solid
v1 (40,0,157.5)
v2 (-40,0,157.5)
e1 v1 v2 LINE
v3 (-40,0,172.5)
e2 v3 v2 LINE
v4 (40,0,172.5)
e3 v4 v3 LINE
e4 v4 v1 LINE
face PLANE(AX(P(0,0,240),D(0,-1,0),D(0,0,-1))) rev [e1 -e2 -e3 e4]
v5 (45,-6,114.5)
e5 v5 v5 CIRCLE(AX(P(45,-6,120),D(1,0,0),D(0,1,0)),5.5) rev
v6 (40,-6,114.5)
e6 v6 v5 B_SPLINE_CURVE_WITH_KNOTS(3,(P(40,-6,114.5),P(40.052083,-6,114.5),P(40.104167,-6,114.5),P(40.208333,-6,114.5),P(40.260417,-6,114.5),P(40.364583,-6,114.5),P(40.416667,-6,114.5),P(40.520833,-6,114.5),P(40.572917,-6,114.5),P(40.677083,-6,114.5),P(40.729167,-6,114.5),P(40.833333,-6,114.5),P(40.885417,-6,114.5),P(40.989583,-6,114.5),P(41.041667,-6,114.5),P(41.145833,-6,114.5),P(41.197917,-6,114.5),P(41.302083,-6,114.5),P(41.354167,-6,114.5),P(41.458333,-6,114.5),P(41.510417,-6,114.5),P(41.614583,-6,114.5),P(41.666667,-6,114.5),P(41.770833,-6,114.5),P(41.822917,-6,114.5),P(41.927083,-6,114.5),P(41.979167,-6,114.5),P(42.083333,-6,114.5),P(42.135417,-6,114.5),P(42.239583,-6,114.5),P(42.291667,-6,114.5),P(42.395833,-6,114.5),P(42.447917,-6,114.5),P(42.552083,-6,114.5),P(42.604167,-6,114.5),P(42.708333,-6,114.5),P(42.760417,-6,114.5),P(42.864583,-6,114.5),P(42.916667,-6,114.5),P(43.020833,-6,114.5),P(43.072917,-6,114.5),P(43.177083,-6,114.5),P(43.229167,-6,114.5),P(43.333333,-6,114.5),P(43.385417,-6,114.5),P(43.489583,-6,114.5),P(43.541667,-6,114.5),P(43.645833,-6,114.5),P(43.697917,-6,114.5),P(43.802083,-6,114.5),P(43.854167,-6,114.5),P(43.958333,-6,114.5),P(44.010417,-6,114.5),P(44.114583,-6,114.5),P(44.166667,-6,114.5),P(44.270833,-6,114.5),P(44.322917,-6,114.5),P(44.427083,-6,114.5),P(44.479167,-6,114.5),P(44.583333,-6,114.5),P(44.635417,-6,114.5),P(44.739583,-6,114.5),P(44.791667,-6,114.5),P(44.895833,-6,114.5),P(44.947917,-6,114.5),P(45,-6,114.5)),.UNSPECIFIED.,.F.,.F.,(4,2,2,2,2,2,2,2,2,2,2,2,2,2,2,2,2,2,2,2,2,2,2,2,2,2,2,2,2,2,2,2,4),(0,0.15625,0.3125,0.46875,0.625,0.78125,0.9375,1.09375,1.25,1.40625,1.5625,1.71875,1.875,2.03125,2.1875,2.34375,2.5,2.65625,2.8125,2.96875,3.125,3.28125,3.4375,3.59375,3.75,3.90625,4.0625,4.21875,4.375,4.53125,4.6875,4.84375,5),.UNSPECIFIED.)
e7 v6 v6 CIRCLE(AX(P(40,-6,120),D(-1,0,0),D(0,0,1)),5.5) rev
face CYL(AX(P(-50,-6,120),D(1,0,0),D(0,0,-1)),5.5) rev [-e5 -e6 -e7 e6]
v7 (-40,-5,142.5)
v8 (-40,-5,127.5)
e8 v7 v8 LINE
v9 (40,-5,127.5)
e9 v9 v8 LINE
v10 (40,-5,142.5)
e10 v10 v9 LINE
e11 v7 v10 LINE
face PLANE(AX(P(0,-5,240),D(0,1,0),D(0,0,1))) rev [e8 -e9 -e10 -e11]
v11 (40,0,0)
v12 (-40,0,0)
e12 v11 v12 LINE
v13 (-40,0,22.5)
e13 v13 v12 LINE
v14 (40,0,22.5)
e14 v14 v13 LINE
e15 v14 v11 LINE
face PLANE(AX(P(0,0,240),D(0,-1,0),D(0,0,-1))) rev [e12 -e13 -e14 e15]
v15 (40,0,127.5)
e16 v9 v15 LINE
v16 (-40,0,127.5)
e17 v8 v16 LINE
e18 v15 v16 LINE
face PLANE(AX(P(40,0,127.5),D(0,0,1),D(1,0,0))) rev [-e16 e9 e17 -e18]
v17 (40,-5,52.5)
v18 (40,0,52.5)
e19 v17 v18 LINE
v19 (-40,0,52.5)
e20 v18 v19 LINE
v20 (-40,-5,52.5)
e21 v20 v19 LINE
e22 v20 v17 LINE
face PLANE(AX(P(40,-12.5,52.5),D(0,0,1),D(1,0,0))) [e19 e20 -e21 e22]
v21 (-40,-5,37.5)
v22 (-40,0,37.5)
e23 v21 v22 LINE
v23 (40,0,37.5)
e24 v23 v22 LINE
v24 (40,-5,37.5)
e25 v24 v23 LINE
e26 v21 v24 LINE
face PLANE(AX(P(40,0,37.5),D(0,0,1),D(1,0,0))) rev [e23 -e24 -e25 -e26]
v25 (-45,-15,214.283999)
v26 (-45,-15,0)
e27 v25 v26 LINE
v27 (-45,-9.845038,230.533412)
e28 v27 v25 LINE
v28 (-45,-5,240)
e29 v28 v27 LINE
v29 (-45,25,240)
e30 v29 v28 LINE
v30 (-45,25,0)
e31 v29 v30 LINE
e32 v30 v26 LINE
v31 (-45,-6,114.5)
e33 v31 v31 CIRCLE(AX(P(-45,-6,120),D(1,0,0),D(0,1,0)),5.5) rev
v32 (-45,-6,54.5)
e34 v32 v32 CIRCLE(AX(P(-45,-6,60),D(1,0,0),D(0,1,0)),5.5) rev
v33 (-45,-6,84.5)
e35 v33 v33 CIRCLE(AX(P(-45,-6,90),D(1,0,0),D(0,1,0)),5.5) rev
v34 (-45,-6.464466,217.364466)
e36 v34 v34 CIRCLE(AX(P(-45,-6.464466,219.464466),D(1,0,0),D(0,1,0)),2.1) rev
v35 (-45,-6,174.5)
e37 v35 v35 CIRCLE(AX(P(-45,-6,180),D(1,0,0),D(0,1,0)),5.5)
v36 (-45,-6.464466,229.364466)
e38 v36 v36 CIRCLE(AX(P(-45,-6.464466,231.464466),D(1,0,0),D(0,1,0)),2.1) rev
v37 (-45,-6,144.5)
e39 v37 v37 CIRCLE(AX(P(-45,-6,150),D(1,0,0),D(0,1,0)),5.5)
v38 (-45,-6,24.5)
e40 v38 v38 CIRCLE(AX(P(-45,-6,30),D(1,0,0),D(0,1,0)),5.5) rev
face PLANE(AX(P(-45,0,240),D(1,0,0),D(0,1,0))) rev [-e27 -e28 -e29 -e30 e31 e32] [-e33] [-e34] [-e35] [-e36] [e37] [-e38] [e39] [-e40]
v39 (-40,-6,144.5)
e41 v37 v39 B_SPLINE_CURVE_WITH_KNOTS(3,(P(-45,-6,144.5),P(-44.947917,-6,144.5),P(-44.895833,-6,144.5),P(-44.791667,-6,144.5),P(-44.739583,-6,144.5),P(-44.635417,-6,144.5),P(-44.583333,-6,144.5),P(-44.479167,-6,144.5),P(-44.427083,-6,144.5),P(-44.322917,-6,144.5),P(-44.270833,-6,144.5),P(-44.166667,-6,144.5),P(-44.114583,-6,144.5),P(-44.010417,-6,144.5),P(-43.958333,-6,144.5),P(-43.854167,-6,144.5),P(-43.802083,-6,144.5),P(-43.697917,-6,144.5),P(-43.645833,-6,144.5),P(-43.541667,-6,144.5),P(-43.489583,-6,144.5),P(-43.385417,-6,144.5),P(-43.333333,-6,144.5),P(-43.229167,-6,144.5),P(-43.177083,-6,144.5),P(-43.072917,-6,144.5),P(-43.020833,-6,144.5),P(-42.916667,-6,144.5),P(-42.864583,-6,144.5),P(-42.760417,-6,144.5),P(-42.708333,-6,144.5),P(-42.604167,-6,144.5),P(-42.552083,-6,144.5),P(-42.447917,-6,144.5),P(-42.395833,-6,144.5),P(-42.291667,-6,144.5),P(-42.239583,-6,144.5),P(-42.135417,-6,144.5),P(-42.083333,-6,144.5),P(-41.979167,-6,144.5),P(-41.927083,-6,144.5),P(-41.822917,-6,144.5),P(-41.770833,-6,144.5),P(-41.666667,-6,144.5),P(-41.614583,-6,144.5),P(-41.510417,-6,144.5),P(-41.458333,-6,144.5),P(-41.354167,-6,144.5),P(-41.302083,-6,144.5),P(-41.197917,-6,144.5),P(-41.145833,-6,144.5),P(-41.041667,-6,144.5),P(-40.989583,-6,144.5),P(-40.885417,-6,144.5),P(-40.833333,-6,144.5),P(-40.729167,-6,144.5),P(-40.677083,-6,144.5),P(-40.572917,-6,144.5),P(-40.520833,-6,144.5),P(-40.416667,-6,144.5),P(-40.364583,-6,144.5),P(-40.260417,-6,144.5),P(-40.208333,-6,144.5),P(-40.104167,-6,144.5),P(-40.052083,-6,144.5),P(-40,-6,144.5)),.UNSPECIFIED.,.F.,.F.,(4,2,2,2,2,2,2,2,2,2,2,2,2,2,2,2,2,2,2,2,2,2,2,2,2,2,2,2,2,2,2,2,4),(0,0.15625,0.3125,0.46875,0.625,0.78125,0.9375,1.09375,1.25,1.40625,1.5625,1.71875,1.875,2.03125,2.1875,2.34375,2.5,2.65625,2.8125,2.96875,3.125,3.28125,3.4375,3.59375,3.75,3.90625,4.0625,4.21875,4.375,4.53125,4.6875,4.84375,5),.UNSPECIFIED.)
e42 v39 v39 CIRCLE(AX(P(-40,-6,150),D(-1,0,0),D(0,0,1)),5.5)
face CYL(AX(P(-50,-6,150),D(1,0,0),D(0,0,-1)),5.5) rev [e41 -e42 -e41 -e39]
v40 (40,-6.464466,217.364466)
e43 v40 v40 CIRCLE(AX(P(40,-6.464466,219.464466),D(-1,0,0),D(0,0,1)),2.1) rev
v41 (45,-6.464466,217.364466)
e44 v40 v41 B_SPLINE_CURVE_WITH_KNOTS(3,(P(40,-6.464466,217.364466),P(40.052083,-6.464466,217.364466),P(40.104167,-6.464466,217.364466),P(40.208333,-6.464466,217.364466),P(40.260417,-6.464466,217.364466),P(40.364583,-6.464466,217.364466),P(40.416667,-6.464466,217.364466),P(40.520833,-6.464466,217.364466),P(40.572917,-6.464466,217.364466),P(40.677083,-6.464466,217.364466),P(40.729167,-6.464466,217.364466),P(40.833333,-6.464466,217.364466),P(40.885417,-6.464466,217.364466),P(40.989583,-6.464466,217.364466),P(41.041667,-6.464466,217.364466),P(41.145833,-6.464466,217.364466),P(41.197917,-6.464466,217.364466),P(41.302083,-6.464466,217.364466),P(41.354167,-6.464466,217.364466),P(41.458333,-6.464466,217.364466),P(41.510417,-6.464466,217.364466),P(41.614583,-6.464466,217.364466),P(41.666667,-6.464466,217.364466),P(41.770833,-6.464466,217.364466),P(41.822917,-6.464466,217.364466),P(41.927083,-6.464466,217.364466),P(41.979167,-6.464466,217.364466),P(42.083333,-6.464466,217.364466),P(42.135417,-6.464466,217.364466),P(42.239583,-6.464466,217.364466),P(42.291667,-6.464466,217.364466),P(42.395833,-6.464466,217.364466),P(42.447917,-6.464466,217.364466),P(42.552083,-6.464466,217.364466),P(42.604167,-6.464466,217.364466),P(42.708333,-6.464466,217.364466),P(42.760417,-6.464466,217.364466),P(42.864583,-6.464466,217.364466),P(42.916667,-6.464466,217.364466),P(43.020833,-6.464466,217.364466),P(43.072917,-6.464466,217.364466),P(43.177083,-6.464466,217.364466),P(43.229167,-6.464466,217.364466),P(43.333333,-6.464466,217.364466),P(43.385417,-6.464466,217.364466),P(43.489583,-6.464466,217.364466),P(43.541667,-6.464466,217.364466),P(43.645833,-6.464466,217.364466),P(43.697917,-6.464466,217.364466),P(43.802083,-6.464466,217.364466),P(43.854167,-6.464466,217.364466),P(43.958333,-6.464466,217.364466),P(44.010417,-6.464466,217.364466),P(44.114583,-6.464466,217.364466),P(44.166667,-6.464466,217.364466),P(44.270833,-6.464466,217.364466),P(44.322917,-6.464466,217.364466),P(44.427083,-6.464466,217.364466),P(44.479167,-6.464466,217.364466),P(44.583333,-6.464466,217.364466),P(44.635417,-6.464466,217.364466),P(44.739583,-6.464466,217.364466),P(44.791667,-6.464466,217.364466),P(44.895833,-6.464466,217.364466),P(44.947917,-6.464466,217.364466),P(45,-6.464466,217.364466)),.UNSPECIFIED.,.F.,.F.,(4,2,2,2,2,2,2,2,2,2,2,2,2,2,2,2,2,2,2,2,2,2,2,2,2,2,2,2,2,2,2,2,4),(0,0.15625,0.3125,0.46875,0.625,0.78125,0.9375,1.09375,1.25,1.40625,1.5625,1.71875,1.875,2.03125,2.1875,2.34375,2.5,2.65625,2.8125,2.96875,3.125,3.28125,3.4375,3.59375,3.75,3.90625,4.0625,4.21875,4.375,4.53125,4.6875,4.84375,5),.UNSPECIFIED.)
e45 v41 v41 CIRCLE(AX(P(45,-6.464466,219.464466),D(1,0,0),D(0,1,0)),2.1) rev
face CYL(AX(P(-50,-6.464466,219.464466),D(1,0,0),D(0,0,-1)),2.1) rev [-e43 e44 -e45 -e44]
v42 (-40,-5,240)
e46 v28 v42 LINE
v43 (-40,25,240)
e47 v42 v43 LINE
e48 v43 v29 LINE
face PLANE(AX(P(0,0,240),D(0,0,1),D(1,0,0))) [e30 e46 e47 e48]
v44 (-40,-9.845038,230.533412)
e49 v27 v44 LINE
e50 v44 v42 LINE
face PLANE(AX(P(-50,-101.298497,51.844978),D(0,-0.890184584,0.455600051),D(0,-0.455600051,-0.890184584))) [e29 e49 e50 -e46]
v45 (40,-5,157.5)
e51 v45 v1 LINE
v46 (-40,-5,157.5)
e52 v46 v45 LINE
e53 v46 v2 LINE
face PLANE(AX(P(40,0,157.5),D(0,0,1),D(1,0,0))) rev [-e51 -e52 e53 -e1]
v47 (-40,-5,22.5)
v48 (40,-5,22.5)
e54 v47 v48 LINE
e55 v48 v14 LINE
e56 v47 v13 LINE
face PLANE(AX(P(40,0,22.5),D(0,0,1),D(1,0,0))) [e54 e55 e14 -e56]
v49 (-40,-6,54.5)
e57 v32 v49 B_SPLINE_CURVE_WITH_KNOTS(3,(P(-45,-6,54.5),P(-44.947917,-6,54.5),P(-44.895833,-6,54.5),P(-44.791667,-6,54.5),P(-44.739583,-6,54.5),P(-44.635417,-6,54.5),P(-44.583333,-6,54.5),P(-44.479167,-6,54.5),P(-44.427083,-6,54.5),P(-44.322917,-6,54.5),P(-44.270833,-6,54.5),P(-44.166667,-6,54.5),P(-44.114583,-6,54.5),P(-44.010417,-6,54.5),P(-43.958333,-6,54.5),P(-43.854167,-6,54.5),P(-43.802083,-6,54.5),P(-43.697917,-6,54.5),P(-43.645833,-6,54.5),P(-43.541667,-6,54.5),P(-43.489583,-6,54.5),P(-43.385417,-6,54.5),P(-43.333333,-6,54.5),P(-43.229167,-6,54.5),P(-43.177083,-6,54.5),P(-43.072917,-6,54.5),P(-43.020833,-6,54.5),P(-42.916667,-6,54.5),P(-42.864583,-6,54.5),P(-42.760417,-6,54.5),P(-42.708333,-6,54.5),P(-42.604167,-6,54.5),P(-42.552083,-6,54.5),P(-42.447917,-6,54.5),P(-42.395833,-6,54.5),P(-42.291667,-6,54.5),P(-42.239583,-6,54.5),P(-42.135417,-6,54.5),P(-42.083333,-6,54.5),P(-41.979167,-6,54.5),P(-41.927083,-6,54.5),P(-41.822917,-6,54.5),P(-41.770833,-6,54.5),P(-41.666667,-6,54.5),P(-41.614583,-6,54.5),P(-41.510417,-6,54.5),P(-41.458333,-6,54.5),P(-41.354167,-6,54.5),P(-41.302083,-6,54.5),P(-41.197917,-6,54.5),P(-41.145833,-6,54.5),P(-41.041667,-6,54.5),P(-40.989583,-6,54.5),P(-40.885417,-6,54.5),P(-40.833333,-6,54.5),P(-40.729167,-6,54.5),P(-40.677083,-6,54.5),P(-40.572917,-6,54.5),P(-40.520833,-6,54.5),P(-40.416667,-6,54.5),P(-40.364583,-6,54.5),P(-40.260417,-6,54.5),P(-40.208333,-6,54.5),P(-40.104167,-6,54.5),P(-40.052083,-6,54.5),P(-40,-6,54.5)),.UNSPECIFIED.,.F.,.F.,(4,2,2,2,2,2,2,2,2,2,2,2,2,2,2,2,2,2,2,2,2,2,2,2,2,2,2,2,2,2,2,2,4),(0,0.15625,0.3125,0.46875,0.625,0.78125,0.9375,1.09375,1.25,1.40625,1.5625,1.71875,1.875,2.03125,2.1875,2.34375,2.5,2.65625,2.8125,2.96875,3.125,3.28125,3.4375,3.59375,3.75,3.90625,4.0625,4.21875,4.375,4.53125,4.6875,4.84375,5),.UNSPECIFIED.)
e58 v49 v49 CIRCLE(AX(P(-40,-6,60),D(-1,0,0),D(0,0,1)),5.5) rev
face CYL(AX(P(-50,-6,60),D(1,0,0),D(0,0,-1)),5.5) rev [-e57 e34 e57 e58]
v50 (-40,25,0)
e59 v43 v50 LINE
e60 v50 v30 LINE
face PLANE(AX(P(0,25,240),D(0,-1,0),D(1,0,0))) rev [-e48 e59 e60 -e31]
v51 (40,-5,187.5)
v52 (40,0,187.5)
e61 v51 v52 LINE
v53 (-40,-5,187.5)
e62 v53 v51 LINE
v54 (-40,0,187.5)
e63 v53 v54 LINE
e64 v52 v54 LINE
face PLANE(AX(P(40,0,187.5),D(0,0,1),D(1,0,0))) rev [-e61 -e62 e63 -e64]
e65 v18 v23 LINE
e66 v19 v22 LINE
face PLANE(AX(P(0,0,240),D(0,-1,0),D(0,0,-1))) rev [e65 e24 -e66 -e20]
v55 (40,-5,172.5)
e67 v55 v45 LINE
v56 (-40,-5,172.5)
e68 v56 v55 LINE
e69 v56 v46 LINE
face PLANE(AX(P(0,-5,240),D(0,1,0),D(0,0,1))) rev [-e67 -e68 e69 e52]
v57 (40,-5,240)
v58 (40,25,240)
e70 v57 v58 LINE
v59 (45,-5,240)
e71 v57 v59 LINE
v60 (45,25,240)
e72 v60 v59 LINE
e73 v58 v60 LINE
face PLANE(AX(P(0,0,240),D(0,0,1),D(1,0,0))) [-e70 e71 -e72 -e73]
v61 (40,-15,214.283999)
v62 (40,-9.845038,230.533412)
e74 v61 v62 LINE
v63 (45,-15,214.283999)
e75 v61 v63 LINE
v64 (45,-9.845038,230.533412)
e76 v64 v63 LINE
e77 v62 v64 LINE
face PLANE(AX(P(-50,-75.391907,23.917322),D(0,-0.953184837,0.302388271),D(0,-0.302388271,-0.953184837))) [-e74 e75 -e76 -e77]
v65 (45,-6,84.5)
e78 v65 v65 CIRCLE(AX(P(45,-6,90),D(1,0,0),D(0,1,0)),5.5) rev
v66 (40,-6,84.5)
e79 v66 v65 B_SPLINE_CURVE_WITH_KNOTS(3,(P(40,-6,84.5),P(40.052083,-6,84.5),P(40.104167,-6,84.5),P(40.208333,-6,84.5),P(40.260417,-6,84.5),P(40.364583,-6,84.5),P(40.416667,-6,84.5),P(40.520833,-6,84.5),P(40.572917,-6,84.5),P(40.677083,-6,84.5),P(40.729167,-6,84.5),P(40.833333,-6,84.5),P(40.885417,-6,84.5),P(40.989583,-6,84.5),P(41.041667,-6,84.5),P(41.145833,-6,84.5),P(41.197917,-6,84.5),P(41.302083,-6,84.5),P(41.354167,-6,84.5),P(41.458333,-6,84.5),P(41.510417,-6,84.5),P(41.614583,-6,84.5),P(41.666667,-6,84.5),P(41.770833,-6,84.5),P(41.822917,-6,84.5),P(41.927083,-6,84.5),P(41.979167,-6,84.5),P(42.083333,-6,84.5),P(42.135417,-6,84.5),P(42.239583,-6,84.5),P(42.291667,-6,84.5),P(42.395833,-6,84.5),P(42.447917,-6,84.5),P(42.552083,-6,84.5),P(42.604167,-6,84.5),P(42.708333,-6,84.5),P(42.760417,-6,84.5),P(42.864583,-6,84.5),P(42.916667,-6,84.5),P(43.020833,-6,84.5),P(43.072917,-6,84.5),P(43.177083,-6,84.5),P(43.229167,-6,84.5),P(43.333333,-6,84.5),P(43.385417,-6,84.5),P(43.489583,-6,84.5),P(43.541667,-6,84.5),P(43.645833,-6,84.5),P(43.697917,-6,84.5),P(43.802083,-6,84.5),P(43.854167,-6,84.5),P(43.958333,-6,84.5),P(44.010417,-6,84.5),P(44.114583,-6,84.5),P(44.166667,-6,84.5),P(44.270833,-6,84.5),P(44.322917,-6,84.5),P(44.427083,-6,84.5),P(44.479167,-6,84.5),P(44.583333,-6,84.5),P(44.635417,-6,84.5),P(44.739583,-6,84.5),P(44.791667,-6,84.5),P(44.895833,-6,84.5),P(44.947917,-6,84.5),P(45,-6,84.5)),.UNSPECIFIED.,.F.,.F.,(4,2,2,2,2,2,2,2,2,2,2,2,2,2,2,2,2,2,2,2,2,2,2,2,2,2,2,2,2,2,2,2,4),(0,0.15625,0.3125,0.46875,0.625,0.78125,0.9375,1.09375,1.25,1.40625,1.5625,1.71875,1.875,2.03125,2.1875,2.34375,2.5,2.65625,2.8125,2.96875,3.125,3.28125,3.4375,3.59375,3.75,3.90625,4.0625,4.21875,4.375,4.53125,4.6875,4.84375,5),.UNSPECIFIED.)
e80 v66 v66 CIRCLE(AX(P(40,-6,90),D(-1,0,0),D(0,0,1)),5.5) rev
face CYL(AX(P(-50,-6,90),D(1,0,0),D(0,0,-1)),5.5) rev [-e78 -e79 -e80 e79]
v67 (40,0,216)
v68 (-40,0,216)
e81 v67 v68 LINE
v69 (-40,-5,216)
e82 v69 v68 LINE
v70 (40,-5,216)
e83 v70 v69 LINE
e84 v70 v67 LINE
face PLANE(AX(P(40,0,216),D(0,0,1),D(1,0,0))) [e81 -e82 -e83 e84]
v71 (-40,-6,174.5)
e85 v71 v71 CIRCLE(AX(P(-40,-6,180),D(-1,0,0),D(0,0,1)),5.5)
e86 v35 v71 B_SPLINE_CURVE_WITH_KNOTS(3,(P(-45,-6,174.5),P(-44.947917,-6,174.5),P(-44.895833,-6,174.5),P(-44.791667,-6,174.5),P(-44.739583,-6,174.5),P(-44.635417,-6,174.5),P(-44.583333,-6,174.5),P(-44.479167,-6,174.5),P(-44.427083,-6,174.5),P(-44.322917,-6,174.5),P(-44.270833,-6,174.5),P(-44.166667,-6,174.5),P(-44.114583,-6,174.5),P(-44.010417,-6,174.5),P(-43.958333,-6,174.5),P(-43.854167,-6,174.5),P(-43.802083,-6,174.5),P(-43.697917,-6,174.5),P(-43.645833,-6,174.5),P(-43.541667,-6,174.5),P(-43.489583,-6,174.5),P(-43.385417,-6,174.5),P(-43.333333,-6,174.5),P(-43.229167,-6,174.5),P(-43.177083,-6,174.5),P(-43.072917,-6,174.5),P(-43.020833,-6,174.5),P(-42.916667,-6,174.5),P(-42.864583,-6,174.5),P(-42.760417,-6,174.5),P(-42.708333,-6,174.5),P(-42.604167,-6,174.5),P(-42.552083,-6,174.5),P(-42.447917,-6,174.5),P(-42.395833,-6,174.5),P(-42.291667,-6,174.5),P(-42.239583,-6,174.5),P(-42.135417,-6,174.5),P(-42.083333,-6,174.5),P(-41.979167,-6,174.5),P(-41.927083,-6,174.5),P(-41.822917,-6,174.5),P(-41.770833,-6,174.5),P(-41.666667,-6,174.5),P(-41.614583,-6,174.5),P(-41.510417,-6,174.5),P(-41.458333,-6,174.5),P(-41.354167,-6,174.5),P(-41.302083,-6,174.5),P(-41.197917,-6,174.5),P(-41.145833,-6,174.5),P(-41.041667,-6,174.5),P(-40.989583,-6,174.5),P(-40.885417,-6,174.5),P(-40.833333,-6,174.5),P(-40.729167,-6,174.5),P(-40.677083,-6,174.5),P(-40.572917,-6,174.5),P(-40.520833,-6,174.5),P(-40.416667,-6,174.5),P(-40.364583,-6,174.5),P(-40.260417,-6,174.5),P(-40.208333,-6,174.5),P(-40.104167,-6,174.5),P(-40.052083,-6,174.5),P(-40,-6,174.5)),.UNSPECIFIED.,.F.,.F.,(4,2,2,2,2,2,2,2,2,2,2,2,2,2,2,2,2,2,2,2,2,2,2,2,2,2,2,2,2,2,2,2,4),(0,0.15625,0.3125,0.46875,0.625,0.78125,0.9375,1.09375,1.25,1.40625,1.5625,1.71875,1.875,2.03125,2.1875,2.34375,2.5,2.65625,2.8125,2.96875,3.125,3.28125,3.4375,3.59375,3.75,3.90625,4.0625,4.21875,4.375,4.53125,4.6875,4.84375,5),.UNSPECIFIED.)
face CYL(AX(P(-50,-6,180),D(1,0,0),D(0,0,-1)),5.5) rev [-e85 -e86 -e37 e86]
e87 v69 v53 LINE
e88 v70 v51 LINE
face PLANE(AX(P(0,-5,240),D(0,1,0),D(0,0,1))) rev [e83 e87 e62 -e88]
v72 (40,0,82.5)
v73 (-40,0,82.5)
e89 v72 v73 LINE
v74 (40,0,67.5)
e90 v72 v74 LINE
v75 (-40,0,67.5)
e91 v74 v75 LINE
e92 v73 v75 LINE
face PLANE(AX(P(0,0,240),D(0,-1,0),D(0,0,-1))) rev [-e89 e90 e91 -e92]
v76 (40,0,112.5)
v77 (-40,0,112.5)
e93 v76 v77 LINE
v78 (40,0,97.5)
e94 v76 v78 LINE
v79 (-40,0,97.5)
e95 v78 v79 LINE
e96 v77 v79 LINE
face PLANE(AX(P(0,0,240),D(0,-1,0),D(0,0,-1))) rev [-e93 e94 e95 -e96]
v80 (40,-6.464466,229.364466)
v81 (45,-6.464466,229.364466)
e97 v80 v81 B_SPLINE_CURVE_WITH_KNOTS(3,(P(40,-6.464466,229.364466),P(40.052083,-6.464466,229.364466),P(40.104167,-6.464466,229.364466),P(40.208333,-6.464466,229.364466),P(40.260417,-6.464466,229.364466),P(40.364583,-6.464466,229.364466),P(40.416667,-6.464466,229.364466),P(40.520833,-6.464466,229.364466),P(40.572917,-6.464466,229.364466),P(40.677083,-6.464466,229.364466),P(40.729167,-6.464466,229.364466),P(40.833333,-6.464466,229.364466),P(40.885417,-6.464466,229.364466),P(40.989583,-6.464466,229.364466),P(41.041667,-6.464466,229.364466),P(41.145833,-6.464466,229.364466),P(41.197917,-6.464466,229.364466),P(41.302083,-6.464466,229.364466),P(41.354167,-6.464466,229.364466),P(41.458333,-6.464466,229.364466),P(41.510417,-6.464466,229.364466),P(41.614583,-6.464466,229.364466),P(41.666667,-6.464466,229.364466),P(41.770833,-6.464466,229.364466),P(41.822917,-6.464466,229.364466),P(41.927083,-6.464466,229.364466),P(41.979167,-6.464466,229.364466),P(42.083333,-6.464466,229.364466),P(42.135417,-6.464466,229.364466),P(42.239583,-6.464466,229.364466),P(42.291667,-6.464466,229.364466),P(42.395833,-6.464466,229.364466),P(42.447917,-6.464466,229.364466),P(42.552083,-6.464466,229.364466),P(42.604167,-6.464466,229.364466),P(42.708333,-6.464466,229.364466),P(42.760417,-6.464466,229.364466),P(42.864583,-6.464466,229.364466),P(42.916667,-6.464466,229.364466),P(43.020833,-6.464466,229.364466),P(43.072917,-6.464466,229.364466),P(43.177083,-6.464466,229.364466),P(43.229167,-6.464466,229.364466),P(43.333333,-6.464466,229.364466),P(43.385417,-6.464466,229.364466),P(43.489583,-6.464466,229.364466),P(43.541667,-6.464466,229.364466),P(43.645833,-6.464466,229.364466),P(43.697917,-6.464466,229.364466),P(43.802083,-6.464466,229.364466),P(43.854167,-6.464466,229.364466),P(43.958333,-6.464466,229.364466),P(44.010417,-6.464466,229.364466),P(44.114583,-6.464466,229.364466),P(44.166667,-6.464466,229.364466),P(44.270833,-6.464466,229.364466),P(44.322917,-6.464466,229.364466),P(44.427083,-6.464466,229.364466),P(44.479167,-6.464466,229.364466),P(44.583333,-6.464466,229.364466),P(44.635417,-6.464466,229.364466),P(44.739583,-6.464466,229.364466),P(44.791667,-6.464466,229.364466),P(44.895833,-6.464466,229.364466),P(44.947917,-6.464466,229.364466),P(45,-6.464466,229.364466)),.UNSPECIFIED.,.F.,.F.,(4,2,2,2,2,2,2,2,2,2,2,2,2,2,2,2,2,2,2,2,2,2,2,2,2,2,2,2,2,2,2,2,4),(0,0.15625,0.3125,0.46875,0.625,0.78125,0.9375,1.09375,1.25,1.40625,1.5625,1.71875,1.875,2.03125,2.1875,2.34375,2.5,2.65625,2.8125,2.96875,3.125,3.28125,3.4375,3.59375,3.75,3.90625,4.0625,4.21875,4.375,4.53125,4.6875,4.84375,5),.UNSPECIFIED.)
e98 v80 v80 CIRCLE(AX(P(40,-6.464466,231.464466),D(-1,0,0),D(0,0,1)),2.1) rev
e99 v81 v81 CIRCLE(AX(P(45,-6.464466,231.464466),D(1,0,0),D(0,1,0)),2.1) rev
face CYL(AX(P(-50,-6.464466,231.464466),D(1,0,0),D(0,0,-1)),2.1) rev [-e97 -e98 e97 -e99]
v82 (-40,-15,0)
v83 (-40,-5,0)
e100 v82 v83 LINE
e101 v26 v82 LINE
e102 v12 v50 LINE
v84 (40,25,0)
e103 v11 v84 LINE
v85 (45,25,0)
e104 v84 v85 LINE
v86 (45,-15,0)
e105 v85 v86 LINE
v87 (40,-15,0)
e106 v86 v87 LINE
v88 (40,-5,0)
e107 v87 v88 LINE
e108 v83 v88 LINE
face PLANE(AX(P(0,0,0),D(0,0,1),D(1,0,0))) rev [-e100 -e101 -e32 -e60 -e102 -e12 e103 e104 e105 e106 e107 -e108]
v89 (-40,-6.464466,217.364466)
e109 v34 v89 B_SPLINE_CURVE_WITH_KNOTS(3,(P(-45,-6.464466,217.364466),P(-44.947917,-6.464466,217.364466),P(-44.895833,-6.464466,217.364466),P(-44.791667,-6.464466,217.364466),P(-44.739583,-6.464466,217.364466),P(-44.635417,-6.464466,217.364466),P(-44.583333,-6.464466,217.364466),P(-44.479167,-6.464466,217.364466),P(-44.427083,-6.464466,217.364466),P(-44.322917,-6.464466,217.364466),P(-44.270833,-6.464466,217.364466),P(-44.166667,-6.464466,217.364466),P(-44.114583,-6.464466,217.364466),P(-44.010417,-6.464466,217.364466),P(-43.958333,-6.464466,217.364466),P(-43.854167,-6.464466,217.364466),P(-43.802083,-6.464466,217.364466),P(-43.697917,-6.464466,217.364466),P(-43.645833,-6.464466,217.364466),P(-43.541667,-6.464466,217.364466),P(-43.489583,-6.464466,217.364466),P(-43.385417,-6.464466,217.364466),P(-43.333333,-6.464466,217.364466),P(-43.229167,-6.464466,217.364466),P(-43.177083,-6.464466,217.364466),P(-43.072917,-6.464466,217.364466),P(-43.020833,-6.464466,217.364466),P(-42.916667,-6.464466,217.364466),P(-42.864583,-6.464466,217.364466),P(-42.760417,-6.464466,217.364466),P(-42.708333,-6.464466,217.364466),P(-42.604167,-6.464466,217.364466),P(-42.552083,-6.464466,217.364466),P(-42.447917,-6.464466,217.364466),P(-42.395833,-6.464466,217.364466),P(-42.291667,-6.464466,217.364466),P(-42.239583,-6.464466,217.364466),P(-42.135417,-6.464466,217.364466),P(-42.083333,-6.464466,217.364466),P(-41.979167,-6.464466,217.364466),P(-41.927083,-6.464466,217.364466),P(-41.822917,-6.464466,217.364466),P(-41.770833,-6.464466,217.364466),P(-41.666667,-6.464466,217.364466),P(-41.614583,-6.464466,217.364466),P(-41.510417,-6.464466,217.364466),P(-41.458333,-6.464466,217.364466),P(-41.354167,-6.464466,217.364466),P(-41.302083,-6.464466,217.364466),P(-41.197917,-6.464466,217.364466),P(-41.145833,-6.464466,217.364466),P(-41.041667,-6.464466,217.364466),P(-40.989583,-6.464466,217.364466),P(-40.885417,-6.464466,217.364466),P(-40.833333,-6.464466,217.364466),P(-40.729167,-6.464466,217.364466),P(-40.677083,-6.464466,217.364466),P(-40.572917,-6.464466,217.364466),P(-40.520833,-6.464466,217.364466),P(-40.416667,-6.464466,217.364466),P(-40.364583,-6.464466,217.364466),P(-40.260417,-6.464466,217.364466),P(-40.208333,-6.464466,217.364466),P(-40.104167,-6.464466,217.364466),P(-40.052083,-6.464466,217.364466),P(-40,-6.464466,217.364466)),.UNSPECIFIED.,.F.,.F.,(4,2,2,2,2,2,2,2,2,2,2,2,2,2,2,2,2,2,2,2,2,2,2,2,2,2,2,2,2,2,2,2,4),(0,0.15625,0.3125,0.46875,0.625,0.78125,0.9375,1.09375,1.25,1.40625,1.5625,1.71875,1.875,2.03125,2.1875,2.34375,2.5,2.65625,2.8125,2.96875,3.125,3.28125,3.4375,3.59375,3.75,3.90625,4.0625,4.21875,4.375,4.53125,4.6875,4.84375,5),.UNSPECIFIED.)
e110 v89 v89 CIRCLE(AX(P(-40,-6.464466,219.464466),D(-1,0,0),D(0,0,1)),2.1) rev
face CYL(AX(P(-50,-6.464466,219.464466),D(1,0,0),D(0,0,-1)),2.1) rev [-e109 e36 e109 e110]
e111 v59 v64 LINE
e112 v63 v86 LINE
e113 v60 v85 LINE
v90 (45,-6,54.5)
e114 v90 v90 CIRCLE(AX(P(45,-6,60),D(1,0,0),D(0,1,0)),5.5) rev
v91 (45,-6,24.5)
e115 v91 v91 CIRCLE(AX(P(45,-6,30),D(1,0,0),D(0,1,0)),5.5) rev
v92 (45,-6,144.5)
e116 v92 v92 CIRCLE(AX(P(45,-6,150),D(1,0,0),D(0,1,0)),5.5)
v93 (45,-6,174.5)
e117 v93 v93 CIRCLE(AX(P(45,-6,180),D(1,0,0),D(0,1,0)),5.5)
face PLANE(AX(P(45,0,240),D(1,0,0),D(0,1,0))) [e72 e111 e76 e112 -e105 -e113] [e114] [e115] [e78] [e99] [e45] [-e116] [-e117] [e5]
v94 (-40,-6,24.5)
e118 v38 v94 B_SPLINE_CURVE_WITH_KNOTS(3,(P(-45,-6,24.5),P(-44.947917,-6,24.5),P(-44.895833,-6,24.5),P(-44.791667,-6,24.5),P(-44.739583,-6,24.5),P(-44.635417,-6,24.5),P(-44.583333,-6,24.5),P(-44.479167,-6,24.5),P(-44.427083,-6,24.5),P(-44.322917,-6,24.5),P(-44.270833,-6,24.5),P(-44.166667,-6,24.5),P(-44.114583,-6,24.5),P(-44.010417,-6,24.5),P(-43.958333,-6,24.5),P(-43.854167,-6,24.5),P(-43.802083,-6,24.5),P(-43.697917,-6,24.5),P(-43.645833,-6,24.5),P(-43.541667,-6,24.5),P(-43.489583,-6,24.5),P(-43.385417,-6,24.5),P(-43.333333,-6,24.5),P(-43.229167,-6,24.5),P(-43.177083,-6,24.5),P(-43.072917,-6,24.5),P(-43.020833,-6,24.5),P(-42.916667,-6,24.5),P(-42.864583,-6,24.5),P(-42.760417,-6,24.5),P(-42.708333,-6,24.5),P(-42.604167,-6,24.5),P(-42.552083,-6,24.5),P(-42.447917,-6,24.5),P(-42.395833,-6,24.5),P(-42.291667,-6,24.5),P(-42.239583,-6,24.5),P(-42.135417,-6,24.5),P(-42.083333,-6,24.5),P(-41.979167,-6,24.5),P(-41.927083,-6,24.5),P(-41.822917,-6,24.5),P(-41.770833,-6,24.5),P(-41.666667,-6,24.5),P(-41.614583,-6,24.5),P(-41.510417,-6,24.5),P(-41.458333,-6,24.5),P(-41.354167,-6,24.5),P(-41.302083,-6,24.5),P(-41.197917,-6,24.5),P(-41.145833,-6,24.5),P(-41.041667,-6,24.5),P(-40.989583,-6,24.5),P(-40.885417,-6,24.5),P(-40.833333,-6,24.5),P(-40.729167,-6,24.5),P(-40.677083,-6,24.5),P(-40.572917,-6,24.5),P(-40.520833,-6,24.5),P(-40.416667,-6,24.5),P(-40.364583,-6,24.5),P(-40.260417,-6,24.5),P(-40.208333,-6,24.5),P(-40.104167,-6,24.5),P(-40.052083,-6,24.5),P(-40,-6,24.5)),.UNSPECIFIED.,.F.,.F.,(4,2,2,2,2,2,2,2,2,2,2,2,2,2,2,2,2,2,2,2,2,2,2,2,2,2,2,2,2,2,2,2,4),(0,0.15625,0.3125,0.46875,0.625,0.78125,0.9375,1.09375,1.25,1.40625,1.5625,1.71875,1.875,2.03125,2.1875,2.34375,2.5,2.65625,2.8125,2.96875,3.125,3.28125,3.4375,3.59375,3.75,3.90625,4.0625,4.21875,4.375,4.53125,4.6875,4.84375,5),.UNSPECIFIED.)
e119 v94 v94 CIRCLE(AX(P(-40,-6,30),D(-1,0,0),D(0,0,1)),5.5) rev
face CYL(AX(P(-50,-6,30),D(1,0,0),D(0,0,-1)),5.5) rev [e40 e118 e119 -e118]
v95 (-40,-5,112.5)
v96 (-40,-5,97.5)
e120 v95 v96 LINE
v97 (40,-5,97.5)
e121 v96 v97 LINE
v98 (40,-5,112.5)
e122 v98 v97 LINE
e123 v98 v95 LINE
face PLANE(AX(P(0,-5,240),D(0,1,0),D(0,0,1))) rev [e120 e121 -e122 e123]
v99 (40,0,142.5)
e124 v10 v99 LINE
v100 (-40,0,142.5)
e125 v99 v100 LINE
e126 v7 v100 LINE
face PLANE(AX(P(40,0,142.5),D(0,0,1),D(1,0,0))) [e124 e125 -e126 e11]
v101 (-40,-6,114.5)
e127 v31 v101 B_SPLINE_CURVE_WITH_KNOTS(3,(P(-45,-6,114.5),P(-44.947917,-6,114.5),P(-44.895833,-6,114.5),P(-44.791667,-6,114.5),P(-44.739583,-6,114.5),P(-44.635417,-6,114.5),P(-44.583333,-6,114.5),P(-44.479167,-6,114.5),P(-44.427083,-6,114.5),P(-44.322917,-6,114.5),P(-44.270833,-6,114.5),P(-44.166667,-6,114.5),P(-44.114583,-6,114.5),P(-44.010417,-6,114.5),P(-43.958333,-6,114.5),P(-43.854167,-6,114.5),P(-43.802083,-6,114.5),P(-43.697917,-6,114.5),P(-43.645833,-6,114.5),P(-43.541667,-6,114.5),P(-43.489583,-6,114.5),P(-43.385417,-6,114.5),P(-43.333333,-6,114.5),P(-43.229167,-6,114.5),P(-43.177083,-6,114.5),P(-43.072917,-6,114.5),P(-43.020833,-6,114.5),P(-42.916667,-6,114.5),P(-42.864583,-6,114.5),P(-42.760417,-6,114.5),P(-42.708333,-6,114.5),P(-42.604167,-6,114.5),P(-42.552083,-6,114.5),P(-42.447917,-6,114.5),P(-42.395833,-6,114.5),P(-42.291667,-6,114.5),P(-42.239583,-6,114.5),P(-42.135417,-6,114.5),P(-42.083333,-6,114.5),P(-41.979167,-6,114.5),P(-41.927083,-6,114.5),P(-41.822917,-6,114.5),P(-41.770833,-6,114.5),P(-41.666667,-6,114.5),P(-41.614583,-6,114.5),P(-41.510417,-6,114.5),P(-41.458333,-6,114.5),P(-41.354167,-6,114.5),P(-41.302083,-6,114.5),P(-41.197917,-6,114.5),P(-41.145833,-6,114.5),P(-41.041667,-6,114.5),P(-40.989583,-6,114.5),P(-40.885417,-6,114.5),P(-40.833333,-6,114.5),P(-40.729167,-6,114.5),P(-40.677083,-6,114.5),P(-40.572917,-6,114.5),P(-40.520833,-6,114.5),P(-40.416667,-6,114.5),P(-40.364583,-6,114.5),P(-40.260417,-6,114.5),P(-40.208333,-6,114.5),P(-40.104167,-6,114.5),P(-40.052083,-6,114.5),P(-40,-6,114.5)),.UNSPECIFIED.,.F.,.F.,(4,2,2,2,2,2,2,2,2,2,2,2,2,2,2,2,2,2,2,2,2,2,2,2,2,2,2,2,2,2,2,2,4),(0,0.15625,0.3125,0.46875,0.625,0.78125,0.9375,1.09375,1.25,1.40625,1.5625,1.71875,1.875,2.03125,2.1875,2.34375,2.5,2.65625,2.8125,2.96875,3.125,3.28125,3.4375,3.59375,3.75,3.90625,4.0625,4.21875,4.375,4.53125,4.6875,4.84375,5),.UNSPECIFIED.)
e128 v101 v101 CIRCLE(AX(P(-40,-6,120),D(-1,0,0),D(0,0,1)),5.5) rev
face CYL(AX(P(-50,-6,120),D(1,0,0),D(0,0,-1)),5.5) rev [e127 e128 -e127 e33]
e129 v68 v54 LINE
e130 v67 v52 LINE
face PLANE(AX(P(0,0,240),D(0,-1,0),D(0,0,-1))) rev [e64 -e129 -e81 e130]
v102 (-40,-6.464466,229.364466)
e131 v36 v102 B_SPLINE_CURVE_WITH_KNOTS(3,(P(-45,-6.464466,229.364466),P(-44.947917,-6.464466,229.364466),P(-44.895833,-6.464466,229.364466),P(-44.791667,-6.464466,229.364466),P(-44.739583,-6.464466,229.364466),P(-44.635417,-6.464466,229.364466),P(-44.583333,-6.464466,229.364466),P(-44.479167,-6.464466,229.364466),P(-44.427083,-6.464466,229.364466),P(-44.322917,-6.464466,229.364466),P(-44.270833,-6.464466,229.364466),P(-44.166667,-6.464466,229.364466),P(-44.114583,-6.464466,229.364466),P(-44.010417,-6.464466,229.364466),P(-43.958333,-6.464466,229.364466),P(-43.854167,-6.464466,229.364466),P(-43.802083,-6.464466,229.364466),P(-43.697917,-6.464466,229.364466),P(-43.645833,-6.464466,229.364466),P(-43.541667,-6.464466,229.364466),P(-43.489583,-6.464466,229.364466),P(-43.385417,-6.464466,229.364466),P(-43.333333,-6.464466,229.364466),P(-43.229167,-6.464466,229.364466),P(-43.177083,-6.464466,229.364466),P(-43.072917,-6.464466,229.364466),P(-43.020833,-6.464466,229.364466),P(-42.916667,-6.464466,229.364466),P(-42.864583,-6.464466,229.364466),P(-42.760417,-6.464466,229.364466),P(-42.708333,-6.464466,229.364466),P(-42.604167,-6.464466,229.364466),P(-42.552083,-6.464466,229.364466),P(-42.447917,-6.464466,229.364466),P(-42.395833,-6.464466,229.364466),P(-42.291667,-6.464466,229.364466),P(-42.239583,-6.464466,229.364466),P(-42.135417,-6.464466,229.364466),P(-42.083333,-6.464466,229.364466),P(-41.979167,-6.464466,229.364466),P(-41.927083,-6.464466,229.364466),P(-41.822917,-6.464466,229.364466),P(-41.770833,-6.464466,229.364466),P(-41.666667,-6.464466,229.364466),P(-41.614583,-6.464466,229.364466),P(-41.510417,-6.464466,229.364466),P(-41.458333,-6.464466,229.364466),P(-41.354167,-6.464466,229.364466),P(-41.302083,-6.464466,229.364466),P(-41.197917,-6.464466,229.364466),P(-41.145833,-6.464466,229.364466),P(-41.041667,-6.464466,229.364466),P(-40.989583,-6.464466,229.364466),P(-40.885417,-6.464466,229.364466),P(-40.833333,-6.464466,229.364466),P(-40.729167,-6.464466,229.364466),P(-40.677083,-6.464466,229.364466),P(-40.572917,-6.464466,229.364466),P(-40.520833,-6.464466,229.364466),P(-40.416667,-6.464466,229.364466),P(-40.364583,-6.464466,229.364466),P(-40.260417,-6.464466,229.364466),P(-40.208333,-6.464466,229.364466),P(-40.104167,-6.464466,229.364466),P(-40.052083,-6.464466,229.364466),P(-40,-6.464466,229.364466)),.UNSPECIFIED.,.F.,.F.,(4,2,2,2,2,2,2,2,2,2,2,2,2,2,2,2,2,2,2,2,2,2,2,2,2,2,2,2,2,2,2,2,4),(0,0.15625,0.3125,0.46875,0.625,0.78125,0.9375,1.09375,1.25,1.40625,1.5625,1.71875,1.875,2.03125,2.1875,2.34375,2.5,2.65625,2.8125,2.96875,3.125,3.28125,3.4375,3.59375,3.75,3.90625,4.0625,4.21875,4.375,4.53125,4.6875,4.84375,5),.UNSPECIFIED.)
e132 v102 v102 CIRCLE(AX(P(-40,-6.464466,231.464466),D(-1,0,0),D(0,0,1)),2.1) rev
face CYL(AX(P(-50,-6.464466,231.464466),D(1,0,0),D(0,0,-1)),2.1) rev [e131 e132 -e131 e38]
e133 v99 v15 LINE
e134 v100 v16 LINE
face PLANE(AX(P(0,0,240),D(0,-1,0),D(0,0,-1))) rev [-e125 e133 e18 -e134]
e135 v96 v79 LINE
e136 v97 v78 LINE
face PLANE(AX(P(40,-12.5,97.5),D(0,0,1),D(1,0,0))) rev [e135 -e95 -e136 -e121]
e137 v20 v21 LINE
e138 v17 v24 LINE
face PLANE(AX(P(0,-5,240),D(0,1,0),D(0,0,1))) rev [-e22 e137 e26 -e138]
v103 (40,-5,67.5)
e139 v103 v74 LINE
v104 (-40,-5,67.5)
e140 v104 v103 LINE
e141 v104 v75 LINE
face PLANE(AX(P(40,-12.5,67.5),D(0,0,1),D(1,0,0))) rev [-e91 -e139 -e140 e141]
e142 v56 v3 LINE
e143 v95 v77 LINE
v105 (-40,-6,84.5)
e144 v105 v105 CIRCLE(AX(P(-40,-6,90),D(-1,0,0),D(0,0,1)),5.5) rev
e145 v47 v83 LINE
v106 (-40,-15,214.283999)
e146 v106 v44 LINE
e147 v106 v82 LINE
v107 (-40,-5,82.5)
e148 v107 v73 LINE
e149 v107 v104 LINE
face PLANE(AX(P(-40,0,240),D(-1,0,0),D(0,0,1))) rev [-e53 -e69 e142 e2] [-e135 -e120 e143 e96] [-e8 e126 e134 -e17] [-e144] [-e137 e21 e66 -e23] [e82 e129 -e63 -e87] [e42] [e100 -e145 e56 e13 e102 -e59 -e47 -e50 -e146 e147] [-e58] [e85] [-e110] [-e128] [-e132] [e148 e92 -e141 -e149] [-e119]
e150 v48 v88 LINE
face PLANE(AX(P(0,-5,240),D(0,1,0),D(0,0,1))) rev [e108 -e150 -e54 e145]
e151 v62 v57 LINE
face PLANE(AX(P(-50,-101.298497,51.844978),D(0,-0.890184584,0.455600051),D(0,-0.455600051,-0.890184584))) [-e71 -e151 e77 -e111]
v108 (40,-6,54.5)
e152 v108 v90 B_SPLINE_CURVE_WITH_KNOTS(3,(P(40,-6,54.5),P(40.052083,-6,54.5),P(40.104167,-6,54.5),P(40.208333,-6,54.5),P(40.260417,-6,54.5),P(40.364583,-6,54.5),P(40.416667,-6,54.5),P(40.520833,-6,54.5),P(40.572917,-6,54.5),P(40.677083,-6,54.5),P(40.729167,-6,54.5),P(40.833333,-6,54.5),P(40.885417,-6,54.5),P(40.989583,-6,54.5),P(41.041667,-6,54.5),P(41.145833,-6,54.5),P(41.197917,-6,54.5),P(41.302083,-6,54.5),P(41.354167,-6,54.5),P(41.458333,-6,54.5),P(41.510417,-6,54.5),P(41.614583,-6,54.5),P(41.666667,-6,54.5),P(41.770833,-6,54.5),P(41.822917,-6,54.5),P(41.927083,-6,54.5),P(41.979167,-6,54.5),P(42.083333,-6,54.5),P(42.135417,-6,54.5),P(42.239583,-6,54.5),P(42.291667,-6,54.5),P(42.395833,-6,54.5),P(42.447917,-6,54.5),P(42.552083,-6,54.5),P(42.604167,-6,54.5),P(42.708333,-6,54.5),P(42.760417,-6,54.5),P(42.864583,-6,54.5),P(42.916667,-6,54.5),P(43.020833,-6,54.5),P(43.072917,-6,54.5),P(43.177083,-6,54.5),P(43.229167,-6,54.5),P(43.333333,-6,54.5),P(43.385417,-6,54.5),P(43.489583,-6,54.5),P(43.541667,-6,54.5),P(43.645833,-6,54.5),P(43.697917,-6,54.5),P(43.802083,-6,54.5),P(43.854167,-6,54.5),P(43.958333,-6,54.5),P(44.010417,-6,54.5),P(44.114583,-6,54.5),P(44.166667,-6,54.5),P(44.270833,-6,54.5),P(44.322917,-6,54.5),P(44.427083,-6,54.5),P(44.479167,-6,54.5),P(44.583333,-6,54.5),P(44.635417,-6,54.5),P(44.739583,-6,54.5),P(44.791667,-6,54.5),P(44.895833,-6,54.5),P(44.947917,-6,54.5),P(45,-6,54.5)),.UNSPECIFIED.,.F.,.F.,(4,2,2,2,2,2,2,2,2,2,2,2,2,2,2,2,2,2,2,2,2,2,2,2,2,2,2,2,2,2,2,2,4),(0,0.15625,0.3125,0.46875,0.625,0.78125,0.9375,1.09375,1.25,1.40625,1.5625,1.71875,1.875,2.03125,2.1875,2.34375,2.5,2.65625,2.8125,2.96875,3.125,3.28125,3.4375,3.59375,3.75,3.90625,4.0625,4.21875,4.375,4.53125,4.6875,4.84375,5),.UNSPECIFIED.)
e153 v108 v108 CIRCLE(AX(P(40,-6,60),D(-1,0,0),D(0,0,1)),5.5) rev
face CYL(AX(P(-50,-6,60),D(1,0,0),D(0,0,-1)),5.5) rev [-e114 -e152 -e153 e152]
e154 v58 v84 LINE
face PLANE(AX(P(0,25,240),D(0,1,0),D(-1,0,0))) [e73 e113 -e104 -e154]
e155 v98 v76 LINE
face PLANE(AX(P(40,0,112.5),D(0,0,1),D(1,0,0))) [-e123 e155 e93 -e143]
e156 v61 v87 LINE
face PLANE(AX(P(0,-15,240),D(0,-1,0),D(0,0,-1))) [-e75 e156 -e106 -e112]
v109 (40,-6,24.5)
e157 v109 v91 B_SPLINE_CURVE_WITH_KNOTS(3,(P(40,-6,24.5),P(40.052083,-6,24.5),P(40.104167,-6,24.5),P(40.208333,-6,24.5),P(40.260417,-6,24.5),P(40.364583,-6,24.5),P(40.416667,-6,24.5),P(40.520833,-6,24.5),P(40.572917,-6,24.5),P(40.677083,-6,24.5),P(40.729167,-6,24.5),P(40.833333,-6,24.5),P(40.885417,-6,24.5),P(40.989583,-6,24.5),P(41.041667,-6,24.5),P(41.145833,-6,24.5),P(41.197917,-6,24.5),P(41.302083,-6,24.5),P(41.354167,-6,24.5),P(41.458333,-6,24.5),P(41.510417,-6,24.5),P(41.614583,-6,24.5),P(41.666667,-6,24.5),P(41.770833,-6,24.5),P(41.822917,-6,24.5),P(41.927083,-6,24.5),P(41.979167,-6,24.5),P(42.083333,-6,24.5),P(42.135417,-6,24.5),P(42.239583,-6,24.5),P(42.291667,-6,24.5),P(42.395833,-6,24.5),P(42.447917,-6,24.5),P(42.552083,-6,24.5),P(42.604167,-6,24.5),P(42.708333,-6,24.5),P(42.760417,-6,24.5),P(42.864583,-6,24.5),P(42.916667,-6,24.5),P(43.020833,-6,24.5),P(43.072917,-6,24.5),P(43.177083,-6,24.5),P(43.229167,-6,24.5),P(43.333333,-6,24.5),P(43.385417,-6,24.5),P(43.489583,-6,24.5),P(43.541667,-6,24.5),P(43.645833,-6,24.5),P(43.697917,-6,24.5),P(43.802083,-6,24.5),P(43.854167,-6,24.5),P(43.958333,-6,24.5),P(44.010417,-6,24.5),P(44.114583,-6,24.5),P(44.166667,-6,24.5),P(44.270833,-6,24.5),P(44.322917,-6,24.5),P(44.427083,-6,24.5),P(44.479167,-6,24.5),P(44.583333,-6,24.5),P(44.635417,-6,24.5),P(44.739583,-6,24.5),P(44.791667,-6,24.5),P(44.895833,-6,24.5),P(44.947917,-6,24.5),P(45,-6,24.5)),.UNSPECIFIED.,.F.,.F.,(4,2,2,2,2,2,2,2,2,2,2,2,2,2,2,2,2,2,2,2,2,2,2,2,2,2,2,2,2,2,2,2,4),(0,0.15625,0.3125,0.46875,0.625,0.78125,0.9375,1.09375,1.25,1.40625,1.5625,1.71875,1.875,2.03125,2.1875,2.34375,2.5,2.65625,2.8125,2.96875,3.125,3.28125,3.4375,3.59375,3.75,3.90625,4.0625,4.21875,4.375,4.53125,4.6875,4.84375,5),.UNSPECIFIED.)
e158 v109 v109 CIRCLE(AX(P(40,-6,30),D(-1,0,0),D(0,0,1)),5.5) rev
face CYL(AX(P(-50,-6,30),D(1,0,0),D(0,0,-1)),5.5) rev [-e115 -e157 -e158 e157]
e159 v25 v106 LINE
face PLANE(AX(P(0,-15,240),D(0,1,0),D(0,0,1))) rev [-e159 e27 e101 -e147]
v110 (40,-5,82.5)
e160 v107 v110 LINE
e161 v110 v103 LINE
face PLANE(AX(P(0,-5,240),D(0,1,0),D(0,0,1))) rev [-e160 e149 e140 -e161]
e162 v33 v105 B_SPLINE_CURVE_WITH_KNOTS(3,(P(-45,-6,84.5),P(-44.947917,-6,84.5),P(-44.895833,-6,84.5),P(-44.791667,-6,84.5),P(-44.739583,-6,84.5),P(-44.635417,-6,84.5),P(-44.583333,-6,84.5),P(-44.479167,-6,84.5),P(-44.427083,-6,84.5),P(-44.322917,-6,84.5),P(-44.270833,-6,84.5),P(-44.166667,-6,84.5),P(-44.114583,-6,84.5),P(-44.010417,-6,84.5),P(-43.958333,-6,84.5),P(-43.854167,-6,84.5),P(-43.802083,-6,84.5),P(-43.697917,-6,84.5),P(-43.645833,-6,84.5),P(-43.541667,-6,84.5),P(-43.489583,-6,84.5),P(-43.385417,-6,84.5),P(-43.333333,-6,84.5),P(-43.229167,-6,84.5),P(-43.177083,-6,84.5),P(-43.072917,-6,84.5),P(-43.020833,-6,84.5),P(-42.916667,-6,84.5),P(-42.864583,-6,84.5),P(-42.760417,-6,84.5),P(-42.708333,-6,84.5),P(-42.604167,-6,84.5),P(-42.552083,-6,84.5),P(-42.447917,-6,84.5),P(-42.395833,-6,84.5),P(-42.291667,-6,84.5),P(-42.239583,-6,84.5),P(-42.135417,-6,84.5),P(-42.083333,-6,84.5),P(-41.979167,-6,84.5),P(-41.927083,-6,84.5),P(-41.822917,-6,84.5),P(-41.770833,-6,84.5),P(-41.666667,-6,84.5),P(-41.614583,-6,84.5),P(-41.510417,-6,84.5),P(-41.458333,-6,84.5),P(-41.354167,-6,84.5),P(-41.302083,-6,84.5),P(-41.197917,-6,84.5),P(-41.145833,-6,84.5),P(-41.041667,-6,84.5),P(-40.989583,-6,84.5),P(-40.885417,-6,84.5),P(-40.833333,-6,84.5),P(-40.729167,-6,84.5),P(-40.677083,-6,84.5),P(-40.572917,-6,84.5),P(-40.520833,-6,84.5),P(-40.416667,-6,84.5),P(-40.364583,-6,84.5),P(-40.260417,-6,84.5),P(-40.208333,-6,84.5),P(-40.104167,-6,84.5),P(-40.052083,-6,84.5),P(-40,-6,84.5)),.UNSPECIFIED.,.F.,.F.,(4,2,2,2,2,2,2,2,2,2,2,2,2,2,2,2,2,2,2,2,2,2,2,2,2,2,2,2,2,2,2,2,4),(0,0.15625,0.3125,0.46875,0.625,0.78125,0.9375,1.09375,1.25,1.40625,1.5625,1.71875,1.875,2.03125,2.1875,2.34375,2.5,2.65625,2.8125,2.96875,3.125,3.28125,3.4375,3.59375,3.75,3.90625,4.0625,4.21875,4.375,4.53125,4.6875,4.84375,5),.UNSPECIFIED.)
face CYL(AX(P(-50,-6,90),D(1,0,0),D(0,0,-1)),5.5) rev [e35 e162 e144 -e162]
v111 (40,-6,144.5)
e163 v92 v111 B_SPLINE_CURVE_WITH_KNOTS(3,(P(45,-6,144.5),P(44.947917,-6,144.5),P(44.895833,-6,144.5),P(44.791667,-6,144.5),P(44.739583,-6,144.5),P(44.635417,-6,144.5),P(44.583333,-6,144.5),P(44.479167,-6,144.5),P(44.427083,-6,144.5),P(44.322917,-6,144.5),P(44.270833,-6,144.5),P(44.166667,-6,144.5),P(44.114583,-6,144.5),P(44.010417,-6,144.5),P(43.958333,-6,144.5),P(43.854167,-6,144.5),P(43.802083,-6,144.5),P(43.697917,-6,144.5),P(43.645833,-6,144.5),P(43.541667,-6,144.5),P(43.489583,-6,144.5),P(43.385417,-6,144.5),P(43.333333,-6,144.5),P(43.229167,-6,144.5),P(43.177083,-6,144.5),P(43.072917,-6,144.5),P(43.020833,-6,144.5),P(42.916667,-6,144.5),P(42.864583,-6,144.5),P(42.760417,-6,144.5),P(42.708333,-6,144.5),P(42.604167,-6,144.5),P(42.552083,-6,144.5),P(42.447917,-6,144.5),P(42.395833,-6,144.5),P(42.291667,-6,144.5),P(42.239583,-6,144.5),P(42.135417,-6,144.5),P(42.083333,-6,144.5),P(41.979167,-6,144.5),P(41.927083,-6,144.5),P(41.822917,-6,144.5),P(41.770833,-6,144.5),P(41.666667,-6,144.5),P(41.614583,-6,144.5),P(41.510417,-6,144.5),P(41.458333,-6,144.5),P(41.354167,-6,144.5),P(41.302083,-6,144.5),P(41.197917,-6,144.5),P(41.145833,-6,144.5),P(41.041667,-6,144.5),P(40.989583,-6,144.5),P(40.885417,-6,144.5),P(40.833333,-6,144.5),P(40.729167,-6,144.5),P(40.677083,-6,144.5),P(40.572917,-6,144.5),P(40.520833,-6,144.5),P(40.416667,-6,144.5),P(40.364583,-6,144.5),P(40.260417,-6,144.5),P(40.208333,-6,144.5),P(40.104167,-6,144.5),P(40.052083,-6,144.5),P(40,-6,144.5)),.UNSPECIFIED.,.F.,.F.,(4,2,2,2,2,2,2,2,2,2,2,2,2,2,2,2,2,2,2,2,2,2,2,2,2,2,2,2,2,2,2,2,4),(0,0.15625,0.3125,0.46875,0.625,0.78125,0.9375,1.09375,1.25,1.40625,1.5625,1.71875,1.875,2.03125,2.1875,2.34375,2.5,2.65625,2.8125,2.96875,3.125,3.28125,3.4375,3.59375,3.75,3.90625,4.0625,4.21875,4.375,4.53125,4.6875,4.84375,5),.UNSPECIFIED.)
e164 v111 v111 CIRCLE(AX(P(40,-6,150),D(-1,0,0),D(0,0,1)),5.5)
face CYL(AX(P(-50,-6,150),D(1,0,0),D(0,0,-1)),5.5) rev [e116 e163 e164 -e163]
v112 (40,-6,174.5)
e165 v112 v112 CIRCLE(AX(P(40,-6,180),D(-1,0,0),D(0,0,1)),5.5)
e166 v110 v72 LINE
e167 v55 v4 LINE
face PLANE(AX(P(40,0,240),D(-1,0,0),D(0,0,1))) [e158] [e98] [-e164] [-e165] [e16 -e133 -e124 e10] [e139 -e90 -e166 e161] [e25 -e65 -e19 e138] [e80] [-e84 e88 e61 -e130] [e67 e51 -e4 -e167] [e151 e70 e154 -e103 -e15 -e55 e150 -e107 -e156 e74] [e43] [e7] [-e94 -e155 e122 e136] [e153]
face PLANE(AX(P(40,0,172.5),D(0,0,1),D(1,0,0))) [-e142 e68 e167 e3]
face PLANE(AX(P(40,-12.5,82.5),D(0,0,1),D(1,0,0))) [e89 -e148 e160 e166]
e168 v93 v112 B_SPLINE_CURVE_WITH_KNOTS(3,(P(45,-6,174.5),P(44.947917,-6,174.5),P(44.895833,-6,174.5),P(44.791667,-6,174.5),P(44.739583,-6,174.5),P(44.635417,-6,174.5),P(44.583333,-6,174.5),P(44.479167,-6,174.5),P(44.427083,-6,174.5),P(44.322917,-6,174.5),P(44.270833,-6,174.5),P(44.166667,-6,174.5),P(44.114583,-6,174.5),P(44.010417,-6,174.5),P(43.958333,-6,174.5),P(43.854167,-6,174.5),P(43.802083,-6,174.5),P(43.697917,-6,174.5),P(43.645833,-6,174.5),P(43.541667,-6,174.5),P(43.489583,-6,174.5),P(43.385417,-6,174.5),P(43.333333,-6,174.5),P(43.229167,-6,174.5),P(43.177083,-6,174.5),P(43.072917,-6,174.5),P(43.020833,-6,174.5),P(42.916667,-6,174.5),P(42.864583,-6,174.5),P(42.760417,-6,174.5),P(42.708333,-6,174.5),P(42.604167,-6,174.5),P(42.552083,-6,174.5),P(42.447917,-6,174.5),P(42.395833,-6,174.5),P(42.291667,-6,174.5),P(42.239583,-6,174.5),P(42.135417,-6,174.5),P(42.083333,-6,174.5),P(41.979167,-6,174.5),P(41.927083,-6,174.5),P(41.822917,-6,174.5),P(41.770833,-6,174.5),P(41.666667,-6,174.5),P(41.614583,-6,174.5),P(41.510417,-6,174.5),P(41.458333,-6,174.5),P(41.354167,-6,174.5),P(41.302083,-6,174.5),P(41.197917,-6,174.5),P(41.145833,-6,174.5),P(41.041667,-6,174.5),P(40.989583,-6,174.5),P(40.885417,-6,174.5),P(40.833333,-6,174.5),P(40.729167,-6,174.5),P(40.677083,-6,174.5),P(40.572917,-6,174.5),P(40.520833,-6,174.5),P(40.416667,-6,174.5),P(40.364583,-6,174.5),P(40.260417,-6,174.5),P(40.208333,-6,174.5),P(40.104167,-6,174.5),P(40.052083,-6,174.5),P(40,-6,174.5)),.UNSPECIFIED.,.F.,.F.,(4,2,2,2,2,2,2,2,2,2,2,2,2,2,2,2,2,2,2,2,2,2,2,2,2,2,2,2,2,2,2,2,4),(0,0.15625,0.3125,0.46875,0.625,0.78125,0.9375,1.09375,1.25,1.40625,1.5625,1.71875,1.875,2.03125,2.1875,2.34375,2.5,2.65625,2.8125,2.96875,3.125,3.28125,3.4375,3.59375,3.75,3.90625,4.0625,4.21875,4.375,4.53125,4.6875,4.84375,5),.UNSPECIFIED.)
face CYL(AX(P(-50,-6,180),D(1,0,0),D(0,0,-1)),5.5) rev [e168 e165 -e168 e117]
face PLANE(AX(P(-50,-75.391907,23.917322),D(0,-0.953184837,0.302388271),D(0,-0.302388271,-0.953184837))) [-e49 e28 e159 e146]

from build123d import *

# Parameters (mm, degrees)
SKETCH_1_W          = 5
SKETCH_1_H          = 10
EXTRUDE_1_DEPTH     = 240
SKETCH_3_R          = 2.1
SKETCH_3_R_2        = 5.5
CUT_EXTRUDE_1_DEPTH = 90
CUT_EXTRUDE_2_DEPTH = 80
SKETCH_8_W          = 24
SKETCH_8_H          = 5
CUT_EXTRUDE_3_DEPTH = 80


# Read off the part's stored shape, not the designer's step: 切除-拉伸2
with BuildPart() as part:
    # 草图1 → 凸台-拉伸1 (new body)
    with BuildSketch(Plane.XY):
        Polygon((0, -5), (0, 0), (-40, 0), (-40, 25), (-45, 25), (-45, -5), (-40, -5), align=None)
        Polygon((40, 25), (40, 0), (0, 0), (0, -5), (40, -5), (45, -5), (45, 25), align=None)
        with Locations((-42.5, -10)):
            Rectangle(SKETCH_1_W, SKETCH_1_H)
        with Locations((42.5, -10)):
            Rectangle(SKETCH_1_W, SKETCH_1_H)
    extrude(amount=EXTRUDE_1_DEPTH)

    # 草图3 → 切除-拉伸1 (cut, symmetric)
    with BuildSketch(Plane.ZY.offset(-40)):
        Polygon((240, -15), (240, -5), (230.53341221, -9.845037717), (214.283999291, -15), align=None)
        with Locations(Location((231.464466094, -6.464466094, 0), (0, 0, 90))):
            Circle(SKETCH_3_R)
        with Locations(Location((30, -6, 0), (0, 0, 90))):
            Circle(SKETCH_3_R_2)
        with Locations(Location((60, -6, 0), (0, 0, 90))):
            Circle(SKETCH_3_R_2)
        with Locations(Location((90, -6, 0), (0, 0, 90))):
            Circle(SKETCH_3_R_2)
        with Locations(Location((120, -6, 0), (0, 0, 90))):
            Circle(SKETCH_3_R_2)
        with Locations(Location((150, -6, 0), (0, 0, 90))):
            Circle(SKETCH_3_R_2)
        with Locations(Location((180, -6, 0), (0, 0, 90))):
            Circle(SKETCH_3_R_2)
        with Locations(Location((219.464466094, -6.464466094, 0), (0, 0, 90))):
            Circle(SKETCH_3_R)
    extrude(amount=CUT_EXTRUDE_1_DEPTH, both=True, mode=Mode.SUBTRACT)

    # 切除-拉伸2 outline → 切除-拉伸2 (cut)
    with BuildSketch(Plane(origin=(-40, 0, 0), x_dir=(0, 0, -1), z_dir=(1, 0, 0))):
        with BuildLine():
            Line((-82.5, -5), (-82.5, 0))
            Line((-82.5, 0), (-97.5, 0))
            Line((-97.5, 0), (-97.5, -5))
            Line((-97.5, -5), (-95.408326913, -5))
            ThreePointArc((-95.408326913, -5), (-90, -0.5), (-84.591673087, -5))
            Line((-84.591673087, -5), (-82.5, -5))
        make_face()
        with BuildLine():
            Line((-52.5, 0), (-67.5, 0))
            Line((-67.5, 0), (-67.5, -5))
            Line((-67.5, -5), (-65.408326913, -5))
            ThreePointArc((-65.408326913, -5), (-60, -0.5), (-54.591673087, -5))
            Line((-54.591673087, -5), (-52.5, -5))
            Line((-52.5, -5), (-52.5, 0))
        make_face()
        with BuildLine():
            Line((-112.5, -5), (-112.5, 0))
            Line((-112.5, 0), (-127.5, 0))
            Line((-127.5, 0), (-127.5, -5))
            Line((-127.5, -5), (-125.408326913, -5))
            ThreePointArc((-125.408326913, -5), (-120, -0.5), (-114.591673087, -5))
            Line((-114.591673087, -5), (-112.5, -5))
        make_face()
        with BuildLine():
            Line((-22.5, 0), (-37.5, 0))
            Line((-37.5, 0), (-37.5, -5))
            Line((-37.5, -5), (-35.408326913, -5))
            ThreePointArc((-35.408326913, -5), (-30, -0.5), (-24.591673087, -5))
            Line((-24.591673087, -5), (-22.5, -5))
            Line((-22.5, -5), (-22.5, 0))
        make_face()
        with BuildLine():
            Line((-142.5, -5), (-142.5, 0))
            Line((-142.5, 0), (-157.5, 0))
            Line((-157.5, 0), (-157.5, -5))
            Line((-157.5, -5), (-155.408326913, -5))
            ThreePointArc((-155.408326913, -5), (-150, -0.5), (-144.591673087, -5))
            Line((-144.591673087, -5), (-142.5, -5))
        make_face()
        with BuildLine():
            Line((-172.5, -5), (-172.5, 0))
            Line((-172.5, 0), (-187.5, 0))
            Line((-187.5, 0), (-187.5, -5))
            Line((-187.5, -5), (-185.408326913, -5))
            ThreePointArc((-185.408326913, -5), (-180, -0.5), (-174.591673087, -5))
            Line((-174.591673087, -5), (-172.5, -5))
        make_face()
    extrude(amount=CUT_EXTRUDE_2_DEPTH, mode=Mode.SUBTRACT)

    # 草图8 → 切除-拉伸3 (cut)
    with BuildSketch(Plane(origin=(-40, 0, 0), x_dir=(0, 0, -1), z_dir=(1, 0, 0))):
        with Locations((-228, -2.5)):
            Rectangle(SKETCH_8_W, SKETCH_8_H)
    extrude(amount=CUT_EXTRUDE_3_DEPTH, mode=Mode.SUBTRACT)


solid = part.part
